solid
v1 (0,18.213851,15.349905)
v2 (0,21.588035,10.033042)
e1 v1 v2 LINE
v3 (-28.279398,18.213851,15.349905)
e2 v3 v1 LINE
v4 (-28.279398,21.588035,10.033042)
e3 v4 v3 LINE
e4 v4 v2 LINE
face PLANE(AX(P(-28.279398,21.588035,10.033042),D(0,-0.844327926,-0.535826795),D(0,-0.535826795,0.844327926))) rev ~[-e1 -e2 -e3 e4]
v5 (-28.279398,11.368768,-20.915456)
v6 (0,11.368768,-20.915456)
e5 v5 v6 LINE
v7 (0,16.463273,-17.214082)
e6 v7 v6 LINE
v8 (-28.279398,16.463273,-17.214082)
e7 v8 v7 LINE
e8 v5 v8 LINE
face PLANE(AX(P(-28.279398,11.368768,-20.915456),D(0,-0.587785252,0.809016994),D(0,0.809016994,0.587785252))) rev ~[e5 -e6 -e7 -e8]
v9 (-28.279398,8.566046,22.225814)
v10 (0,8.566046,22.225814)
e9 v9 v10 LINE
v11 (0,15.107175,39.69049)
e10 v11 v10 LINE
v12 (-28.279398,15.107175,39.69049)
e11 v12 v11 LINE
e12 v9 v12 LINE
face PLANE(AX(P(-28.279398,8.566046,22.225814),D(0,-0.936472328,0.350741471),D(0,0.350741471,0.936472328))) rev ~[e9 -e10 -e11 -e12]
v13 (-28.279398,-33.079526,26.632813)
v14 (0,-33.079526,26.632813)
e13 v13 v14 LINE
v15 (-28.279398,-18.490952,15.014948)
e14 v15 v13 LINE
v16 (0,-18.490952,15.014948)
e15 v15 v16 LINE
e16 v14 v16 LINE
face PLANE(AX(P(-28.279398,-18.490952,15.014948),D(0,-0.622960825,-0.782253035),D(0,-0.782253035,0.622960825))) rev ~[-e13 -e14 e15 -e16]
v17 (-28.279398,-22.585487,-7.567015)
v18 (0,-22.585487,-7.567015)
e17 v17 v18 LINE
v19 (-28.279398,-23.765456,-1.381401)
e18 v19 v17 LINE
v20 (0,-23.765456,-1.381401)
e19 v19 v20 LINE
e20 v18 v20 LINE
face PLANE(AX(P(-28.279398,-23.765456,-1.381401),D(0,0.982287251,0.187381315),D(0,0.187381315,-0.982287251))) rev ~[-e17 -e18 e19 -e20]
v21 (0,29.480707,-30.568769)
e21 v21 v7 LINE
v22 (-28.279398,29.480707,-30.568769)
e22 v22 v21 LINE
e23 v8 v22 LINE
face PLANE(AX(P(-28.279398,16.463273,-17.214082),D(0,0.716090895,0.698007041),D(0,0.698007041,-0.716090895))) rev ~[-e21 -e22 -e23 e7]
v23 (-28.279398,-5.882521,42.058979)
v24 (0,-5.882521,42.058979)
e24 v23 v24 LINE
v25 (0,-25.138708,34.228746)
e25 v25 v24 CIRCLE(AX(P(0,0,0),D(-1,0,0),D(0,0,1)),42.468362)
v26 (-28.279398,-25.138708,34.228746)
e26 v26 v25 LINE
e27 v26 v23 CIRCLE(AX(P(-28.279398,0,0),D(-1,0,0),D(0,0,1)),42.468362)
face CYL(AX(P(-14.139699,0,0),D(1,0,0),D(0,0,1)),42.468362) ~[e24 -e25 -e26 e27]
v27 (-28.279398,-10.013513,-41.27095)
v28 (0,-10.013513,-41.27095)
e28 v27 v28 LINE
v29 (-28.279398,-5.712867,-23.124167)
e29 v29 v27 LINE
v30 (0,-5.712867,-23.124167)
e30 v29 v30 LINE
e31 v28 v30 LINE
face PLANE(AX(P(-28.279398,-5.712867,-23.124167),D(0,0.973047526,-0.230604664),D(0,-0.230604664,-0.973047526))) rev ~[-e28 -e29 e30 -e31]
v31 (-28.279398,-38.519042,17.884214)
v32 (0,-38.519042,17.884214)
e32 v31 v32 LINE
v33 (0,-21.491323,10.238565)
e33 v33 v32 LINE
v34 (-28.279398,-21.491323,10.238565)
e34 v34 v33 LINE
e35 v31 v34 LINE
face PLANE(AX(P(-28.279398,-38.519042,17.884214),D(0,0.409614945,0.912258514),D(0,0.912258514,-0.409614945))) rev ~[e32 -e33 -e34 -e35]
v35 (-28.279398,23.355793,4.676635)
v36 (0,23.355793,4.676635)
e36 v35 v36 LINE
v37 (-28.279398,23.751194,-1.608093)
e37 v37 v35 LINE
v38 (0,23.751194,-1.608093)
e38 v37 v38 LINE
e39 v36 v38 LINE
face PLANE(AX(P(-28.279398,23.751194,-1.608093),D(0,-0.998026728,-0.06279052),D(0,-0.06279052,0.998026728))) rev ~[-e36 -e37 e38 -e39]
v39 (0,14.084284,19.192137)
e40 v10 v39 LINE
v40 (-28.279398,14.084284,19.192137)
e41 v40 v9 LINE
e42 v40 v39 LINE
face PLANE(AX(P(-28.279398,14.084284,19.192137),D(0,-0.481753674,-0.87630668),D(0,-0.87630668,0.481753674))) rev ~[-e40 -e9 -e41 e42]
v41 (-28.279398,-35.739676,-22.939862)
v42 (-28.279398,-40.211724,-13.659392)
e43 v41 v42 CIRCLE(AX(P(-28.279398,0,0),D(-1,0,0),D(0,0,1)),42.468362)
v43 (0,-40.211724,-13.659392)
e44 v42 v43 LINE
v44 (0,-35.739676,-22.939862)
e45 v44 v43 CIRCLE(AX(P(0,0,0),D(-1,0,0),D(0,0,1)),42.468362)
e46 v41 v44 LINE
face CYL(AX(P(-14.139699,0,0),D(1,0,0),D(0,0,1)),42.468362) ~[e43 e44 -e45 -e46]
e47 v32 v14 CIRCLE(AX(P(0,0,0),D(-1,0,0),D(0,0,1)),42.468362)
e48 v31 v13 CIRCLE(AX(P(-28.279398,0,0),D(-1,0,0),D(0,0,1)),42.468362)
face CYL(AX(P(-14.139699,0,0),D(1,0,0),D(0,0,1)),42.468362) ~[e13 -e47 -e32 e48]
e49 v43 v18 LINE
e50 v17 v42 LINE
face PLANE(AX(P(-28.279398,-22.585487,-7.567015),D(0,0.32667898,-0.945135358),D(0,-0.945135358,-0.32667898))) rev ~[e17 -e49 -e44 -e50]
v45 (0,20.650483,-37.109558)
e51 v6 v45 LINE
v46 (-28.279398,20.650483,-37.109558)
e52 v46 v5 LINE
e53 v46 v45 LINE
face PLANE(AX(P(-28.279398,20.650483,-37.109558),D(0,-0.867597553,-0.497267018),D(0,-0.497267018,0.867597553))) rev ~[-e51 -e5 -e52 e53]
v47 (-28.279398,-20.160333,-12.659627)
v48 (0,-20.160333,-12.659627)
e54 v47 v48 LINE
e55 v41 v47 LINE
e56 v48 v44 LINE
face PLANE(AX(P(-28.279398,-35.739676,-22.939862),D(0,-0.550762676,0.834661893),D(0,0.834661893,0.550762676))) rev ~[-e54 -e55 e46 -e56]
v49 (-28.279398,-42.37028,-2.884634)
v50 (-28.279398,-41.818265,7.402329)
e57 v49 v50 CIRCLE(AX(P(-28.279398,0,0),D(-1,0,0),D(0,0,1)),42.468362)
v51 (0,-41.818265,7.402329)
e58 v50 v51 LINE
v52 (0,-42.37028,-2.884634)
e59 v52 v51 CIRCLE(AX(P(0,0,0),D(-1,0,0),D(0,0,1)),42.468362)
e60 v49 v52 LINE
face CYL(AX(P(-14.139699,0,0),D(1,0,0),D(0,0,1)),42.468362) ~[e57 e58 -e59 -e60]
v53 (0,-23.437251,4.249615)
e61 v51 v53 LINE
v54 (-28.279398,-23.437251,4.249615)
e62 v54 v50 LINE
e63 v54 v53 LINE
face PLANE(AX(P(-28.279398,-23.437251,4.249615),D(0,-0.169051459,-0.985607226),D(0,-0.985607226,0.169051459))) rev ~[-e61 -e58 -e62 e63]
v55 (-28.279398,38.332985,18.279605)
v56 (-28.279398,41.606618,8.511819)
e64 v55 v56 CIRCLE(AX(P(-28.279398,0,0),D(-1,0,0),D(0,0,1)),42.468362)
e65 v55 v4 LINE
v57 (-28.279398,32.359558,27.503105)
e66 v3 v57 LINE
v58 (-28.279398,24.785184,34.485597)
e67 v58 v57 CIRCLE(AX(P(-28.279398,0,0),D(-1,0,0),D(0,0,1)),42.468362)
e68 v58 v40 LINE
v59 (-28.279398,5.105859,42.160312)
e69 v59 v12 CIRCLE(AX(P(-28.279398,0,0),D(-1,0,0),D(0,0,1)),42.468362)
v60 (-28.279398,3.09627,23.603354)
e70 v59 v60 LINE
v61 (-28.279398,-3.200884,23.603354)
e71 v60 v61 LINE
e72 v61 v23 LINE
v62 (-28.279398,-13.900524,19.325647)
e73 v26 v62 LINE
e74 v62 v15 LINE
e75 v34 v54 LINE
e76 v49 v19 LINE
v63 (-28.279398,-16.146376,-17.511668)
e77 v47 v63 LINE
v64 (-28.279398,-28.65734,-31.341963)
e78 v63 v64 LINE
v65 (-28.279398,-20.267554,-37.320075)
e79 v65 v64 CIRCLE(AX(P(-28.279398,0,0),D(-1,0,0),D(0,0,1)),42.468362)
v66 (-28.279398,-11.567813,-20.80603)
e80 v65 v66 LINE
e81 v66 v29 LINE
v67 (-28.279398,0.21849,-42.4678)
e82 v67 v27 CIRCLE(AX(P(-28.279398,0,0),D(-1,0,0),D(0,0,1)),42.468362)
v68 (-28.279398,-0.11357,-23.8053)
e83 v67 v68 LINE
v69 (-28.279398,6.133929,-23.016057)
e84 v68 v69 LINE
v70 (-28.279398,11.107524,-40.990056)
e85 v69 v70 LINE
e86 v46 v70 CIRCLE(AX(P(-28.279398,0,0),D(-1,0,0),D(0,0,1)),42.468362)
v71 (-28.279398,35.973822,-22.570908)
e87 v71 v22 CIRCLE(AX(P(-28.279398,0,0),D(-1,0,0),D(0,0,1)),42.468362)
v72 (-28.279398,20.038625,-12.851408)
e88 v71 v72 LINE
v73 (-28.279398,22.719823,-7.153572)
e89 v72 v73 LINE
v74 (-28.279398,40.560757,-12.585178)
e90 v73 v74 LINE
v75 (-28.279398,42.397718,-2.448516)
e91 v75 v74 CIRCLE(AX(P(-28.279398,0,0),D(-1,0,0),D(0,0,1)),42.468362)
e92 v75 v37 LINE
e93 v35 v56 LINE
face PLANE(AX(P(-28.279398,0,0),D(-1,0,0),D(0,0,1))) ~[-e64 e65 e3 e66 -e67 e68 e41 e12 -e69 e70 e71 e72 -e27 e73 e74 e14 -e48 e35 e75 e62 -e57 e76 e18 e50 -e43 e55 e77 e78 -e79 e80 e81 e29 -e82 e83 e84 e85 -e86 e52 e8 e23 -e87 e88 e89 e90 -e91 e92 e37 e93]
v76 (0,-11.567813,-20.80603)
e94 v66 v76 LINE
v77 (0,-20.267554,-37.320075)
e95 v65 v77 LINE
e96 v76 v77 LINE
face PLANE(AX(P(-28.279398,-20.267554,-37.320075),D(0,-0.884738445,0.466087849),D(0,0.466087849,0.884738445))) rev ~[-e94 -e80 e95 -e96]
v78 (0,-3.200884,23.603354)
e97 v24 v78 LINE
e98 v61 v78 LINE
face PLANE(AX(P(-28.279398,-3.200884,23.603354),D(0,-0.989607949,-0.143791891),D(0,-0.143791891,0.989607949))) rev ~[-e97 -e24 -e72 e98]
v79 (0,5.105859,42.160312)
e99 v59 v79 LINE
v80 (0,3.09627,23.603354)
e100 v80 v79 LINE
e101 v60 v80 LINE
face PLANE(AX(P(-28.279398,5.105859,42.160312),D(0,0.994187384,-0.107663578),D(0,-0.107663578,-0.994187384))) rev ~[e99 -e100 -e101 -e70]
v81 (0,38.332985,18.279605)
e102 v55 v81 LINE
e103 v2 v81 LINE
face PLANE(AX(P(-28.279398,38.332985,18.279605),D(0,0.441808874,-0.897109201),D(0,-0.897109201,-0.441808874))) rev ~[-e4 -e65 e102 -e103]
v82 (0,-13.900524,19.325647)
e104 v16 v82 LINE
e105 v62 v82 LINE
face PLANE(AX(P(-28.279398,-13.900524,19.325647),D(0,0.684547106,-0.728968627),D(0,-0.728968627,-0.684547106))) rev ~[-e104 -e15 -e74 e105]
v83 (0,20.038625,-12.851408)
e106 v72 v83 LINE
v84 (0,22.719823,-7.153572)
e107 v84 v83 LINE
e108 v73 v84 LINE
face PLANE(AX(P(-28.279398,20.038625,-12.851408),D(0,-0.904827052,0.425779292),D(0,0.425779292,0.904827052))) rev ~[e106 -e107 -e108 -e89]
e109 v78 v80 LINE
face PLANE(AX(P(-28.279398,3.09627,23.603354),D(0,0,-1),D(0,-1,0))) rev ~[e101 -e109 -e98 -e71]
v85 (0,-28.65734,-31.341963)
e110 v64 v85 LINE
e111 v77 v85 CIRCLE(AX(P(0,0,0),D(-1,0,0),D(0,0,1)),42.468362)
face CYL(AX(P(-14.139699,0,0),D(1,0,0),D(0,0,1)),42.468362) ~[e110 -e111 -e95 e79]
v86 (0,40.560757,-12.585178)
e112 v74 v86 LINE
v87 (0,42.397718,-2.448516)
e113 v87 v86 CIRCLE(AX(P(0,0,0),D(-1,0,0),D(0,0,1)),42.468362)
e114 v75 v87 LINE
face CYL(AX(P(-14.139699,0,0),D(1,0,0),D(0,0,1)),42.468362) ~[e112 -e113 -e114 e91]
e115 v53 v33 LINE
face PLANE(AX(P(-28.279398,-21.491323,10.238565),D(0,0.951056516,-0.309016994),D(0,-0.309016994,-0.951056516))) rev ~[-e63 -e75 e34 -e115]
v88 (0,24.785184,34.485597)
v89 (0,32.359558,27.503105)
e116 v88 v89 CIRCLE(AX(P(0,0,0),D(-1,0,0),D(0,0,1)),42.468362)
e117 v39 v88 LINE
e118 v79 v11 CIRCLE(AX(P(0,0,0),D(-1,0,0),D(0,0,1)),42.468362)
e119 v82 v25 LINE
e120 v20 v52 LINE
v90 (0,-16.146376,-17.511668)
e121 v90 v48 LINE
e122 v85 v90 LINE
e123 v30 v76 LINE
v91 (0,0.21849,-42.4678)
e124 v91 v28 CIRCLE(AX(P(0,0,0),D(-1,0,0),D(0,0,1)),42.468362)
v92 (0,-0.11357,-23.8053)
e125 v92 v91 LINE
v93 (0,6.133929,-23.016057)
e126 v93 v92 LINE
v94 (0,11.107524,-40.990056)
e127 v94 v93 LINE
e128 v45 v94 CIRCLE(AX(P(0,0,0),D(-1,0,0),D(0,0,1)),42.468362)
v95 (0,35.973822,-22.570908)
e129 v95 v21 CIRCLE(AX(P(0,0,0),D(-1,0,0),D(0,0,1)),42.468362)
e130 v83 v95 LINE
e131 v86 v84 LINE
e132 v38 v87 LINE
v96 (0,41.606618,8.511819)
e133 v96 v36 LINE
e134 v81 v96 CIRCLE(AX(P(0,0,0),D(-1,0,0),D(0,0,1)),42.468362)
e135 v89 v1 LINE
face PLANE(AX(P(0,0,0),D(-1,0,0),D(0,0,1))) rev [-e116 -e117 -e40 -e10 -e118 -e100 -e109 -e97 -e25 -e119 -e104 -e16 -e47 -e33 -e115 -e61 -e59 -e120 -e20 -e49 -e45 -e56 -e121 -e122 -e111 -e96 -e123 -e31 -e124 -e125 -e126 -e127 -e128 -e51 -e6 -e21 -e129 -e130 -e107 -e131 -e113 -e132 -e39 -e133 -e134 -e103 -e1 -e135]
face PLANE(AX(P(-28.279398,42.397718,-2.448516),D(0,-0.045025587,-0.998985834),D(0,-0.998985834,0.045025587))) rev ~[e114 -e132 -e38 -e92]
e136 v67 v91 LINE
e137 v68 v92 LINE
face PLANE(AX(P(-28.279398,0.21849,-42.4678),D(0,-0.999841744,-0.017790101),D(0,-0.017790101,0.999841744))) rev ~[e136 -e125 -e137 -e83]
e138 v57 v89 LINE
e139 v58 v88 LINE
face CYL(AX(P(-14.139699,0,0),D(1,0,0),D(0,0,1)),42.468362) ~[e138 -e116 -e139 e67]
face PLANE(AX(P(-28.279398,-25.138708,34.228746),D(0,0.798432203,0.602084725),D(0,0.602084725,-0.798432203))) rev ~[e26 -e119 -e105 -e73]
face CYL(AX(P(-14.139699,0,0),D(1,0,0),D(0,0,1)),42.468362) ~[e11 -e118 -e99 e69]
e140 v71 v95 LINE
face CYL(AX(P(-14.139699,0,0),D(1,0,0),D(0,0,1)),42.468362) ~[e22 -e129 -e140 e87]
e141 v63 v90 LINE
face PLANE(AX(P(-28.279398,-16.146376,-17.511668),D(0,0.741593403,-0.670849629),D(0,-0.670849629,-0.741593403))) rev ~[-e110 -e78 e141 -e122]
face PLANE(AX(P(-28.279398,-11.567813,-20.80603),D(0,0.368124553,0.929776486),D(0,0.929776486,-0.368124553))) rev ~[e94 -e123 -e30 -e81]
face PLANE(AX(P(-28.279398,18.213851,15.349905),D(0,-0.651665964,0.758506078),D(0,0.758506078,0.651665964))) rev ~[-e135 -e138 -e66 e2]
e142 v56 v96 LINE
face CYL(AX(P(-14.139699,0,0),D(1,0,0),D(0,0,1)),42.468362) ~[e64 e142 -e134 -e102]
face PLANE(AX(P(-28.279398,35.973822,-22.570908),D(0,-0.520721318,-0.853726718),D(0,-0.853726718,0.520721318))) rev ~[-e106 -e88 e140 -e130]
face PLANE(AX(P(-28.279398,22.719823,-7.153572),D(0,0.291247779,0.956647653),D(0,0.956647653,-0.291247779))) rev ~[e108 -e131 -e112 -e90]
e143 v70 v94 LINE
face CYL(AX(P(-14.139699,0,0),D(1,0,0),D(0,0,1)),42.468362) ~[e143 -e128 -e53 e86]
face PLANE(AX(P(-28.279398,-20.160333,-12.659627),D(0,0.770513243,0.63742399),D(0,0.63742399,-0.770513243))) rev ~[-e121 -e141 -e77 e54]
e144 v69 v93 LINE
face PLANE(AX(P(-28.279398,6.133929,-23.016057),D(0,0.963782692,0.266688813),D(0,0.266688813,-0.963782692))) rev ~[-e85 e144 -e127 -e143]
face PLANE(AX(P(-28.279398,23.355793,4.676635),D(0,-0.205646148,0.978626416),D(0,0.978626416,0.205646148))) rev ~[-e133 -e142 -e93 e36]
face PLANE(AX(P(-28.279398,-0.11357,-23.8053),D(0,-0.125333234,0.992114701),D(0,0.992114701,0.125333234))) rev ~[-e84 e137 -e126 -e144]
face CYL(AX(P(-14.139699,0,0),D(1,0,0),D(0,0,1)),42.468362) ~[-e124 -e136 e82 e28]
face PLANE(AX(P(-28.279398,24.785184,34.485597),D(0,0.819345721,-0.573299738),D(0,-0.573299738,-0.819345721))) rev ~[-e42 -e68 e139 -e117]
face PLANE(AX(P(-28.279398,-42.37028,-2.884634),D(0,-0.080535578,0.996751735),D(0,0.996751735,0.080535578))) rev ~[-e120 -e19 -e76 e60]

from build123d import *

# Parameters (mm, degrees)
F0_W            = 28.2793976367
F0_H            = 42.4683615565
F3_DEPTH        = 50.8
F3_COPIES_COUNT = 12
F3_COPIES_ANGLE = 316.8


# Not quite as in the source:
# - a feature of the source that left no trace in its solid (it failed there, or was rolled back) is left out
# - a pattern or mirror of a feature is missing from the dataset's text; its kind, count and spacing are read off the source's solid


with BuildPart() as f1:
    # F0 (on Front) → F1 (revolve)
    with BuildSketch(Plane.XZ):
        with Locations((-14.1396988183, 21.2341807783)):
            Rectangle(F0_W, F0_H)
    revolve(axis=Axis((-14.1396988183, 0, 0), (-1, 0, 0)))

    # F2 (on face) → F3 (cut)
    with BuildSketch(Plane(origin=(-28.2793976367, 0, 0), x_dir=(0, -1, 0), z_dir=(-1, 0, 0))):
        with BuildLine():
            ThreePointArc((5.8825213519, 42.0589785401), (0.3916223416, 42.4665558438), (-5.1058594535, 42.1603122917))
            Line((-5.1058594535, 42.1603122917), (-3.0962699093, 23.6033536494))
            Line((-3.0962699093, 23.6033536494), (0, 23.6033536494))
            Line((0, 23.6033536494), (3.2008844428, 23.6033536494))
            Line((3.2008844428, 23.6033536494), (5.8825213519, 42.0589785401))
        make_face()
    f3 = extrude(amount=-F3_DEPTH, mode=Mode.SUBTRACT)

    # F3_copies: F3 ×12 about axis
    f3_copies_axis = Axis((0, 0, 0), (-1, 0, 0))
    for i in range(1, F3_COPIES_COUNT):
        add(f3.rotate(f3_copies_axis, i * F3_COPIES_ANGLE / (F3_COPIES_COUNT - 1)), mode=Mode.SUBTRACT)


solid = f1.part
